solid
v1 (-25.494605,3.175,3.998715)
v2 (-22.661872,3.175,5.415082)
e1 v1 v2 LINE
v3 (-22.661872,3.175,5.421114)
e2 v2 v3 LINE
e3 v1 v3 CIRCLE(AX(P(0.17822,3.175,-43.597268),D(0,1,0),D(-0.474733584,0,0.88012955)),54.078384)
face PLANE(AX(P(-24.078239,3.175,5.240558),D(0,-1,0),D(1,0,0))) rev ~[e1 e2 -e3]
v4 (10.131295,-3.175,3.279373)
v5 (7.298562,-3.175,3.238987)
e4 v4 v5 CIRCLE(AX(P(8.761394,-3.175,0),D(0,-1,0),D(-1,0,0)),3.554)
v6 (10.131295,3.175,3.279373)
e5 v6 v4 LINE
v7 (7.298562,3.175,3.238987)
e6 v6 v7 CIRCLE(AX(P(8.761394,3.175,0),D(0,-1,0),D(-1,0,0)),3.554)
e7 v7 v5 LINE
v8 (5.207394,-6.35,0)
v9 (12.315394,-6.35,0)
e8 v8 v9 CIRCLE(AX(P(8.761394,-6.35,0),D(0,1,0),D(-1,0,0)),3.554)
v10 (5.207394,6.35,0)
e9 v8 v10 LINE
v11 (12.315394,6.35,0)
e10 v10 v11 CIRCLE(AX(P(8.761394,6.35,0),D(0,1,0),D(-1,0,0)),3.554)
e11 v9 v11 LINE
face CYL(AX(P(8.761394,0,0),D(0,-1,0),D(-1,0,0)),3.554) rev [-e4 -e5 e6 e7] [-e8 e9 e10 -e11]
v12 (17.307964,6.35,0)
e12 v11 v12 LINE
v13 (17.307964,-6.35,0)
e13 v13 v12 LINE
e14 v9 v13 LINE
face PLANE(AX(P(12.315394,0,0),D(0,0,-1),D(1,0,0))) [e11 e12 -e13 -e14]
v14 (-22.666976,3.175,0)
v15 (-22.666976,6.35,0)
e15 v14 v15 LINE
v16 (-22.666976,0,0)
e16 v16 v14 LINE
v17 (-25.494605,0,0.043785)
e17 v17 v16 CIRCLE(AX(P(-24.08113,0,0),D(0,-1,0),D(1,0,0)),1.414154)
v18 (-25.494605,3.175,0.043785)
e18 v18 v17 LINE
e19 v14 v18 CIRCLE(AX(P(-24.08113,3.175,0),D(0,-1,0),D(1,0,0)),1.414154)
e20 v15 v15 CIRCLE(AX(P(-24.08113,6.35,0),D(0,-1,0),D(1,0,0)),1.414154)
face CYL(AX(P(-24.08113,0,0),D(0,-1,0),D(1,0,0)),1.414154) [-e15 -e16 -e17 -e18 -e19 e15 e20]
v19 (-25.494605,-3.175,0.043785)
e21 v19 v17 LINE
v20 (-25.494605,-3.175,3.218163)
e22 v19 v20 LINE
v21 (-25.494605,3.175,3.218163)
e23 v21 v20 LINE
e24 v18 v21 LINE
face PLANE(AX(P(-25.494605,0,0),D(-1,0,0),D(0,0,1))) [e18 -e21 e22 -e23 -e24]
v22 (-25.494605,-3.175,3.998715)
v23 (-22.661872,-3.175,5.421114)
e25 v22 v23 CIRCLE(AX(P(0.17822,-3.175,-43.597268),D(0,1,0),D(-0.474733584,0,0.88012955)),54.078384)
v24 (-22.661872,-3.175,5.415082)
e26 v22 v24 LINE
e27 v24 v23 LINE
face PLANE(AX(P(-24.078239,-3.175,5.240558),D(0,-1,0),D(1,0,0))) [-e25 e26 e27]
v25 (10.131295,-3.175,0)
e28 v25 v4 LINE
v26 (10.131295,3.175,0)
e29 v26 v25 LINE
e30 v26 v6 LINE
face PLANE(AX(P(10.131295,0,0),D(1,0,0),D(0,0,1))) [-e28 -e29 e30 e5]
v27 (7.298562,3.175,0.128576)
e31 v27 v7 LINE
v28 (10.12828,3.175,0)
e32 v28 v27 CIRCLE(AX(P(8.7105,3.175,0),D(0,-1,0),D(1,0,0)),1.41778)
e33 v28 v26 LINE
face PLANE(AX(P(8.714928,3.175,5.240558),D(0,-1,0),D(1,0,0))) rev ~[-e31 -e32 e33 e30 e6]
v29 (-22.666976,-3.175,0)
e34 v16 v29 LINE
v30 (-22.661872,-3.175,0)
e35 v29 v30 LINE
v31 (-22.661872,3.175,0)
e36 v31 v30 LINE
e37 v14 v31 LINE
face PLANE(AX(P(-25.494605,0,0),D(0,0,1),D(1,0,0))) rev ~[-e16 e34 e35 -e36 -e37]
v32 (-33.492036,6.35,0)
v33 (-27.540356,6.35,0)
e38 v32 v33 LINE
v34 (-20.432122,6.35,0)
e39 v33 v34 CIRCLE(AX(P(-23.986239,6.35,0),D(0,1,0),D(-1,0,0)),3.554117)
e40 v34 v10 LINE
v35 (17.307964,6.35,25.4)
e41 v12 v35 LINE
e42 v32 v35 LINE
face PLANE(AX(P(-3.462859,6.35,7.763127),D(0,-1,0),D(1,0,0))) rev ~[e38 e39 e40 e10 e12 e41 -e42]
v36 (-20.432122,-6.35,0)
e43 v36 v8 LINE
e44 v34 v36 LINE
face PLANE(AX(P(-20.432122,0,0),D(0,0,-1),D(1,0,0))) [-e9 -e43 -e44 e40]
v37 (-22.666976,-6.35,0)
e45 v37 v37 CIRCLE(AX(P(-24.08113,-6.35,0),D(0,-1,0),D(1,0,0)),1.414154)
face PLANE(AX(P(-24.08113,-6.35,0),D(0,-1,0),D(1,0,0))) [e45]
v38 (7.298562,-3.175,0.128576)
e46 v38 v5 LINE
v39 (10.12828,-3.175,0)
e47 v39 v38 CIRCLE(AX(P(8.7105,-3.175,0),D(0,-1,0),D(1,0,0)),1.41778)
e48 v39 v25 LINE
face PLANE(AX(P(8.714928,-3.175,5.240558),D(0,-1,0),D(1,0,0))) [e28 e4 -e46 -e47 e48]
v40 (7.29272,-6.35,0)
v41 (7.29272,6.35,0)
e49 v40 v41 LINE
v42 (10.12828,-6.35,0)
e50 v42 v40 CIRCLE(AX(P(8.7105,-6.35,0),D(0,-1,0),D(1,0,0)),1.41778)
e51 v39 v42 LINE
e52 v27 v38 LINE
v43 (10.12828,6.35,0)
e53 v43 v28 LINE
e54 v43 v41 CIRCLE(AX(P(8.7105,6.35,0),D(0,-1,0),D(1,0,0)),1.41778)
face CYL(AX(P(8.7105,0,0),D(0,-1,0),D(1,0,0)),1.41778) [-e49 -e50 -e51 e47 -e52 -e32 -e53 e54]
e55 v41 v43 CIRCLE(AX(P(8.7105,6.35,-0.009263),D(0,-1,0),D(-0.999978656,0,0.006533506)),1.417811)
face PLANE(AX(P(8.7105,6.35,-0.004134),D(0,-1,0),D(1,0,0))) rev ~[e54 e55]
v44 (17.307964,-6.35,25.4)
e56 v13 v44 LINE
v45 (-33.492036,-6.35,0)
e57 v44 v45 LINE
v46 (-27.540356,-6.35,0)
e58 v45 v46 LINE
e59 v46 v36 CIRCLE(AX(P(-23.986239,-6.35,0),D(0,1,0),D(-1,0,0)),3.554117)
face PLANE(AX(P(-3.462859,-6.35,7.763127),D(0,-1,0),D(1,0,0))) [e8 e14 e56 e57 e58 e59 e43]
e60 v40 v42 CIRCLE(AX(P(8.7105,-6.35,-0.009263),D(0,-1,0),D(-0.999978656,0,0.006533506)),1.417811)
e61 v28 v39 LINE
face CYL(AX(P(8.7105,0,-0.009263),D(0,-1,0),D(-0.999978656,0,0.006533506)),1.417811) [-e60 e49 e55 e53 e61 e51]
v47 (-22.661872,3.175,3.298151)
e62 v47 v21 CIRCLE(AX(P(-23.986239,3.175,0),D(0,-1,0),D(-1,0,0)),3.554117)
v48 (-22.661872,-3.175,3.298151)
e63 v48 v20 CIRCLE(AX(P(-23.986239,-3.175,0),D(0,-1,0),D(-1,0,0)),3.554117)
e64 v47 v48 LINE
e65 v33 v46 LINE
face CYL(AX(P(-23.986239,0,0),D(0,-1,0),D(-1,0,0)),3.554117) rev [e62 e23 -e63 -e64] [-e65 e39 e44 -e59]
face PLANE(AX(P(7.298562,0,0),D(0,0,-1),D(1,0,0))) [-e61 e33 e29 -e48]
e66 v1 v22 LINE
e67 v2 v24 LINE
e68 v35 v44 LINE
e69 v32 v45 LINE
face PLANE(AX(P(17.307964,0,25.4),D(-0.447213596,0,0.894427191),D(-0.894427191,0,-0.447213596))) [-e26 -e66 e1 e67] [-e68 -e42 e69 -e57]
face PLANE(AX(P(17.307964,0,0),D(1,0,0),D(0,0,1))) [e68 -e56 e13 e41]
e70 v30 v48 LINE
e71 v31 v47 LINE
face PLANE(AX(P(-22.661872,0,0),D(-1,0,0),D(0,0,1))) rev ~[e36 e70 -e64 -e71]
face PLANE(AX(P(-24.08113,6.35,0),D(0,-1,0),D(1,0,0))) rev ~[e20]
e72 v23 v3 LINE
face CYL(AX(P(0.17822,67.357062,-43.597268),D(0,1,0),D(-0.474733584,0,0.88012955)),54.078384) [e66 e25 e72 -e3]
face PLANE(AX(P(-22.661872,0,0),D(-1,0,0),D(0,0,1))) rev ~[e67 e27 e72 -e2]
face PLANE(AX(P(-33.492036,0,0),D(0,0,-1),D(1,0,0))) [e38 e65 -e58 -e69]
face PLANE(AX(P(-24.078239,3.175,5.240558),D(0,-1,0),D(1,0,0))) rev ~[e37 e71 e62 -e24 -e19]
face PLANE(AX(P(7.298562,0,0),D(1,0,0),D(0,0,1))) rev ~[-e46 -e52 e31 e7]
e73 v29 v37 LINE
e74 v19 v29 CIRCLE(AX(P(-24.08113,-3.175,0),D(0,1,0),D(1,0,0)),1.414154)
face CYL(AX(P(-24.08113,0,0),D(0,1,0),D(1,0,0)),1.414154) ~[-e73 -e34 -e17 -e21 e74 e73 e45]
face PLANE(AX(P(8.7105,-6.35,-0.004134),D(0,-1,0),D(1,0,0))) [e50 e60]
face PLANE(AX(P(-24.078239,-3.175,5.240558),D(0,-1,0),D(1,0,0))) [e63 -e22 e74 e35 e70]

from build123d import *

# Parameters (mm, degrees)
F1_DEPTH    = 6.35
F2_W        = 2.8327330947
F2_H        = 10.4811154306
F3_DEPTH    = 3.175
F4_T4_DEPTH = 134.7141247892
F6_DEPTH    = 6.35


# Not quite as in the source:
# - a fillet or chamfer that OpenCascade refuses, or shapes differently, is made with other operations: its cross-section is extruded or revolved along the edge and cut away or added
# - a feature names something its author has since deleted; it is built from what else it names


with BuildPart() as f1:
    # F0 (on Front) → F1 (new body, symmetric)
    with BuildSketch(Plane.XZ):
        with BuildLine():
            Line((17.3079642735, 0), (17.3079642735, 25.4))
            Line((17.3079642735, 25.4), (-33.4920357265, 0))
            Line((-33.4920357265, 0), (-27.5403555314, 0))
            ThreePointArc((-27.5403555314, 0), (-23.9862389863, 3.5541165451), (-20.4321224411, 0))
            Line((-20.4321224411, 0), (5.2073936615, 0))
            ThreePointArc((5.2073936615, 0), (8.7613936615, 3.554), (12.3153936615, 0))
            Line((12.3153936615, 0), (17.3079642735, 0))
        make_face()
    extrude(amount=F1_DEPTH, both=True)

    # F2 (on Front) → F3 (join, symmetric)
    with BuildSketch(Plane.XZ):
        with Locations((-24.0782387555, 5.2405577153)):
            Rectangle(F2_W, F2_H)
        with Locations((8.7149282917, 5.2405577153)):
            Rectangle(F2_W, F2_H)
    extrude(amount=F3_DEPTH, both=True)

    # F4: fillet of radius 54.0783837972 on 1 edges, made by hand


with BuildPart() as f4_tool2:
    # F4_s3 → F4_t4 (new body)
    with BuildSketch(Plane.XZ.offset(-67.3570623946)):
        with BuildLine():
            ThreePointArc((-25.4946053028, 3.9987152119), (-13.0610727535, 8.8354764656), (0.178219655, 10.4811154306))
            Line((0.178219655, 10.4811154306), (-25.4946053028, 10.4811154306))
            Line((-25.4946053028, 10.4811154306), (-25.4946053028, 3.9987152119))
        make_face()
    extrude(amount=F4_T4_DEPTH)

    split(bisect_by=Plane.YZ.offset(-22.6618722081), keep=Keep.BOTTOM)


with BuildPart() as f1_1:
    add(f1.part)

    # F4_t1: cut F4_tool2
    add(f4_tool2.part, mode=Mode.SUBTRACT)

    # F5 (on Front) → F6 (join, symmetric)
    with BuildSketch(Plane.XZ):
        with BuildLine():
            ThreePointArc((-25.4952833056, 0), (-24.0811295807, -1.4141537249), (-22.6669758558, 0))
            ThreePointArc((-22.6669758558, 0), (-24.0811295807, 1.4141537249), (-25.4952833056, 0))
        make_face()
        with BuildLine():
            ThreePointArc((7.2927195579, 0), (8.7104998529, -1.4270738296), (10.1282801479, 0))
            ThreePointArc((10.1282801479, 0), (8.7104998529, 1.417780295), (7.2927195579, 0))
        make_face()
    extrude(amount=F6_DEPTH, both=True)


solid = f1_1.part
